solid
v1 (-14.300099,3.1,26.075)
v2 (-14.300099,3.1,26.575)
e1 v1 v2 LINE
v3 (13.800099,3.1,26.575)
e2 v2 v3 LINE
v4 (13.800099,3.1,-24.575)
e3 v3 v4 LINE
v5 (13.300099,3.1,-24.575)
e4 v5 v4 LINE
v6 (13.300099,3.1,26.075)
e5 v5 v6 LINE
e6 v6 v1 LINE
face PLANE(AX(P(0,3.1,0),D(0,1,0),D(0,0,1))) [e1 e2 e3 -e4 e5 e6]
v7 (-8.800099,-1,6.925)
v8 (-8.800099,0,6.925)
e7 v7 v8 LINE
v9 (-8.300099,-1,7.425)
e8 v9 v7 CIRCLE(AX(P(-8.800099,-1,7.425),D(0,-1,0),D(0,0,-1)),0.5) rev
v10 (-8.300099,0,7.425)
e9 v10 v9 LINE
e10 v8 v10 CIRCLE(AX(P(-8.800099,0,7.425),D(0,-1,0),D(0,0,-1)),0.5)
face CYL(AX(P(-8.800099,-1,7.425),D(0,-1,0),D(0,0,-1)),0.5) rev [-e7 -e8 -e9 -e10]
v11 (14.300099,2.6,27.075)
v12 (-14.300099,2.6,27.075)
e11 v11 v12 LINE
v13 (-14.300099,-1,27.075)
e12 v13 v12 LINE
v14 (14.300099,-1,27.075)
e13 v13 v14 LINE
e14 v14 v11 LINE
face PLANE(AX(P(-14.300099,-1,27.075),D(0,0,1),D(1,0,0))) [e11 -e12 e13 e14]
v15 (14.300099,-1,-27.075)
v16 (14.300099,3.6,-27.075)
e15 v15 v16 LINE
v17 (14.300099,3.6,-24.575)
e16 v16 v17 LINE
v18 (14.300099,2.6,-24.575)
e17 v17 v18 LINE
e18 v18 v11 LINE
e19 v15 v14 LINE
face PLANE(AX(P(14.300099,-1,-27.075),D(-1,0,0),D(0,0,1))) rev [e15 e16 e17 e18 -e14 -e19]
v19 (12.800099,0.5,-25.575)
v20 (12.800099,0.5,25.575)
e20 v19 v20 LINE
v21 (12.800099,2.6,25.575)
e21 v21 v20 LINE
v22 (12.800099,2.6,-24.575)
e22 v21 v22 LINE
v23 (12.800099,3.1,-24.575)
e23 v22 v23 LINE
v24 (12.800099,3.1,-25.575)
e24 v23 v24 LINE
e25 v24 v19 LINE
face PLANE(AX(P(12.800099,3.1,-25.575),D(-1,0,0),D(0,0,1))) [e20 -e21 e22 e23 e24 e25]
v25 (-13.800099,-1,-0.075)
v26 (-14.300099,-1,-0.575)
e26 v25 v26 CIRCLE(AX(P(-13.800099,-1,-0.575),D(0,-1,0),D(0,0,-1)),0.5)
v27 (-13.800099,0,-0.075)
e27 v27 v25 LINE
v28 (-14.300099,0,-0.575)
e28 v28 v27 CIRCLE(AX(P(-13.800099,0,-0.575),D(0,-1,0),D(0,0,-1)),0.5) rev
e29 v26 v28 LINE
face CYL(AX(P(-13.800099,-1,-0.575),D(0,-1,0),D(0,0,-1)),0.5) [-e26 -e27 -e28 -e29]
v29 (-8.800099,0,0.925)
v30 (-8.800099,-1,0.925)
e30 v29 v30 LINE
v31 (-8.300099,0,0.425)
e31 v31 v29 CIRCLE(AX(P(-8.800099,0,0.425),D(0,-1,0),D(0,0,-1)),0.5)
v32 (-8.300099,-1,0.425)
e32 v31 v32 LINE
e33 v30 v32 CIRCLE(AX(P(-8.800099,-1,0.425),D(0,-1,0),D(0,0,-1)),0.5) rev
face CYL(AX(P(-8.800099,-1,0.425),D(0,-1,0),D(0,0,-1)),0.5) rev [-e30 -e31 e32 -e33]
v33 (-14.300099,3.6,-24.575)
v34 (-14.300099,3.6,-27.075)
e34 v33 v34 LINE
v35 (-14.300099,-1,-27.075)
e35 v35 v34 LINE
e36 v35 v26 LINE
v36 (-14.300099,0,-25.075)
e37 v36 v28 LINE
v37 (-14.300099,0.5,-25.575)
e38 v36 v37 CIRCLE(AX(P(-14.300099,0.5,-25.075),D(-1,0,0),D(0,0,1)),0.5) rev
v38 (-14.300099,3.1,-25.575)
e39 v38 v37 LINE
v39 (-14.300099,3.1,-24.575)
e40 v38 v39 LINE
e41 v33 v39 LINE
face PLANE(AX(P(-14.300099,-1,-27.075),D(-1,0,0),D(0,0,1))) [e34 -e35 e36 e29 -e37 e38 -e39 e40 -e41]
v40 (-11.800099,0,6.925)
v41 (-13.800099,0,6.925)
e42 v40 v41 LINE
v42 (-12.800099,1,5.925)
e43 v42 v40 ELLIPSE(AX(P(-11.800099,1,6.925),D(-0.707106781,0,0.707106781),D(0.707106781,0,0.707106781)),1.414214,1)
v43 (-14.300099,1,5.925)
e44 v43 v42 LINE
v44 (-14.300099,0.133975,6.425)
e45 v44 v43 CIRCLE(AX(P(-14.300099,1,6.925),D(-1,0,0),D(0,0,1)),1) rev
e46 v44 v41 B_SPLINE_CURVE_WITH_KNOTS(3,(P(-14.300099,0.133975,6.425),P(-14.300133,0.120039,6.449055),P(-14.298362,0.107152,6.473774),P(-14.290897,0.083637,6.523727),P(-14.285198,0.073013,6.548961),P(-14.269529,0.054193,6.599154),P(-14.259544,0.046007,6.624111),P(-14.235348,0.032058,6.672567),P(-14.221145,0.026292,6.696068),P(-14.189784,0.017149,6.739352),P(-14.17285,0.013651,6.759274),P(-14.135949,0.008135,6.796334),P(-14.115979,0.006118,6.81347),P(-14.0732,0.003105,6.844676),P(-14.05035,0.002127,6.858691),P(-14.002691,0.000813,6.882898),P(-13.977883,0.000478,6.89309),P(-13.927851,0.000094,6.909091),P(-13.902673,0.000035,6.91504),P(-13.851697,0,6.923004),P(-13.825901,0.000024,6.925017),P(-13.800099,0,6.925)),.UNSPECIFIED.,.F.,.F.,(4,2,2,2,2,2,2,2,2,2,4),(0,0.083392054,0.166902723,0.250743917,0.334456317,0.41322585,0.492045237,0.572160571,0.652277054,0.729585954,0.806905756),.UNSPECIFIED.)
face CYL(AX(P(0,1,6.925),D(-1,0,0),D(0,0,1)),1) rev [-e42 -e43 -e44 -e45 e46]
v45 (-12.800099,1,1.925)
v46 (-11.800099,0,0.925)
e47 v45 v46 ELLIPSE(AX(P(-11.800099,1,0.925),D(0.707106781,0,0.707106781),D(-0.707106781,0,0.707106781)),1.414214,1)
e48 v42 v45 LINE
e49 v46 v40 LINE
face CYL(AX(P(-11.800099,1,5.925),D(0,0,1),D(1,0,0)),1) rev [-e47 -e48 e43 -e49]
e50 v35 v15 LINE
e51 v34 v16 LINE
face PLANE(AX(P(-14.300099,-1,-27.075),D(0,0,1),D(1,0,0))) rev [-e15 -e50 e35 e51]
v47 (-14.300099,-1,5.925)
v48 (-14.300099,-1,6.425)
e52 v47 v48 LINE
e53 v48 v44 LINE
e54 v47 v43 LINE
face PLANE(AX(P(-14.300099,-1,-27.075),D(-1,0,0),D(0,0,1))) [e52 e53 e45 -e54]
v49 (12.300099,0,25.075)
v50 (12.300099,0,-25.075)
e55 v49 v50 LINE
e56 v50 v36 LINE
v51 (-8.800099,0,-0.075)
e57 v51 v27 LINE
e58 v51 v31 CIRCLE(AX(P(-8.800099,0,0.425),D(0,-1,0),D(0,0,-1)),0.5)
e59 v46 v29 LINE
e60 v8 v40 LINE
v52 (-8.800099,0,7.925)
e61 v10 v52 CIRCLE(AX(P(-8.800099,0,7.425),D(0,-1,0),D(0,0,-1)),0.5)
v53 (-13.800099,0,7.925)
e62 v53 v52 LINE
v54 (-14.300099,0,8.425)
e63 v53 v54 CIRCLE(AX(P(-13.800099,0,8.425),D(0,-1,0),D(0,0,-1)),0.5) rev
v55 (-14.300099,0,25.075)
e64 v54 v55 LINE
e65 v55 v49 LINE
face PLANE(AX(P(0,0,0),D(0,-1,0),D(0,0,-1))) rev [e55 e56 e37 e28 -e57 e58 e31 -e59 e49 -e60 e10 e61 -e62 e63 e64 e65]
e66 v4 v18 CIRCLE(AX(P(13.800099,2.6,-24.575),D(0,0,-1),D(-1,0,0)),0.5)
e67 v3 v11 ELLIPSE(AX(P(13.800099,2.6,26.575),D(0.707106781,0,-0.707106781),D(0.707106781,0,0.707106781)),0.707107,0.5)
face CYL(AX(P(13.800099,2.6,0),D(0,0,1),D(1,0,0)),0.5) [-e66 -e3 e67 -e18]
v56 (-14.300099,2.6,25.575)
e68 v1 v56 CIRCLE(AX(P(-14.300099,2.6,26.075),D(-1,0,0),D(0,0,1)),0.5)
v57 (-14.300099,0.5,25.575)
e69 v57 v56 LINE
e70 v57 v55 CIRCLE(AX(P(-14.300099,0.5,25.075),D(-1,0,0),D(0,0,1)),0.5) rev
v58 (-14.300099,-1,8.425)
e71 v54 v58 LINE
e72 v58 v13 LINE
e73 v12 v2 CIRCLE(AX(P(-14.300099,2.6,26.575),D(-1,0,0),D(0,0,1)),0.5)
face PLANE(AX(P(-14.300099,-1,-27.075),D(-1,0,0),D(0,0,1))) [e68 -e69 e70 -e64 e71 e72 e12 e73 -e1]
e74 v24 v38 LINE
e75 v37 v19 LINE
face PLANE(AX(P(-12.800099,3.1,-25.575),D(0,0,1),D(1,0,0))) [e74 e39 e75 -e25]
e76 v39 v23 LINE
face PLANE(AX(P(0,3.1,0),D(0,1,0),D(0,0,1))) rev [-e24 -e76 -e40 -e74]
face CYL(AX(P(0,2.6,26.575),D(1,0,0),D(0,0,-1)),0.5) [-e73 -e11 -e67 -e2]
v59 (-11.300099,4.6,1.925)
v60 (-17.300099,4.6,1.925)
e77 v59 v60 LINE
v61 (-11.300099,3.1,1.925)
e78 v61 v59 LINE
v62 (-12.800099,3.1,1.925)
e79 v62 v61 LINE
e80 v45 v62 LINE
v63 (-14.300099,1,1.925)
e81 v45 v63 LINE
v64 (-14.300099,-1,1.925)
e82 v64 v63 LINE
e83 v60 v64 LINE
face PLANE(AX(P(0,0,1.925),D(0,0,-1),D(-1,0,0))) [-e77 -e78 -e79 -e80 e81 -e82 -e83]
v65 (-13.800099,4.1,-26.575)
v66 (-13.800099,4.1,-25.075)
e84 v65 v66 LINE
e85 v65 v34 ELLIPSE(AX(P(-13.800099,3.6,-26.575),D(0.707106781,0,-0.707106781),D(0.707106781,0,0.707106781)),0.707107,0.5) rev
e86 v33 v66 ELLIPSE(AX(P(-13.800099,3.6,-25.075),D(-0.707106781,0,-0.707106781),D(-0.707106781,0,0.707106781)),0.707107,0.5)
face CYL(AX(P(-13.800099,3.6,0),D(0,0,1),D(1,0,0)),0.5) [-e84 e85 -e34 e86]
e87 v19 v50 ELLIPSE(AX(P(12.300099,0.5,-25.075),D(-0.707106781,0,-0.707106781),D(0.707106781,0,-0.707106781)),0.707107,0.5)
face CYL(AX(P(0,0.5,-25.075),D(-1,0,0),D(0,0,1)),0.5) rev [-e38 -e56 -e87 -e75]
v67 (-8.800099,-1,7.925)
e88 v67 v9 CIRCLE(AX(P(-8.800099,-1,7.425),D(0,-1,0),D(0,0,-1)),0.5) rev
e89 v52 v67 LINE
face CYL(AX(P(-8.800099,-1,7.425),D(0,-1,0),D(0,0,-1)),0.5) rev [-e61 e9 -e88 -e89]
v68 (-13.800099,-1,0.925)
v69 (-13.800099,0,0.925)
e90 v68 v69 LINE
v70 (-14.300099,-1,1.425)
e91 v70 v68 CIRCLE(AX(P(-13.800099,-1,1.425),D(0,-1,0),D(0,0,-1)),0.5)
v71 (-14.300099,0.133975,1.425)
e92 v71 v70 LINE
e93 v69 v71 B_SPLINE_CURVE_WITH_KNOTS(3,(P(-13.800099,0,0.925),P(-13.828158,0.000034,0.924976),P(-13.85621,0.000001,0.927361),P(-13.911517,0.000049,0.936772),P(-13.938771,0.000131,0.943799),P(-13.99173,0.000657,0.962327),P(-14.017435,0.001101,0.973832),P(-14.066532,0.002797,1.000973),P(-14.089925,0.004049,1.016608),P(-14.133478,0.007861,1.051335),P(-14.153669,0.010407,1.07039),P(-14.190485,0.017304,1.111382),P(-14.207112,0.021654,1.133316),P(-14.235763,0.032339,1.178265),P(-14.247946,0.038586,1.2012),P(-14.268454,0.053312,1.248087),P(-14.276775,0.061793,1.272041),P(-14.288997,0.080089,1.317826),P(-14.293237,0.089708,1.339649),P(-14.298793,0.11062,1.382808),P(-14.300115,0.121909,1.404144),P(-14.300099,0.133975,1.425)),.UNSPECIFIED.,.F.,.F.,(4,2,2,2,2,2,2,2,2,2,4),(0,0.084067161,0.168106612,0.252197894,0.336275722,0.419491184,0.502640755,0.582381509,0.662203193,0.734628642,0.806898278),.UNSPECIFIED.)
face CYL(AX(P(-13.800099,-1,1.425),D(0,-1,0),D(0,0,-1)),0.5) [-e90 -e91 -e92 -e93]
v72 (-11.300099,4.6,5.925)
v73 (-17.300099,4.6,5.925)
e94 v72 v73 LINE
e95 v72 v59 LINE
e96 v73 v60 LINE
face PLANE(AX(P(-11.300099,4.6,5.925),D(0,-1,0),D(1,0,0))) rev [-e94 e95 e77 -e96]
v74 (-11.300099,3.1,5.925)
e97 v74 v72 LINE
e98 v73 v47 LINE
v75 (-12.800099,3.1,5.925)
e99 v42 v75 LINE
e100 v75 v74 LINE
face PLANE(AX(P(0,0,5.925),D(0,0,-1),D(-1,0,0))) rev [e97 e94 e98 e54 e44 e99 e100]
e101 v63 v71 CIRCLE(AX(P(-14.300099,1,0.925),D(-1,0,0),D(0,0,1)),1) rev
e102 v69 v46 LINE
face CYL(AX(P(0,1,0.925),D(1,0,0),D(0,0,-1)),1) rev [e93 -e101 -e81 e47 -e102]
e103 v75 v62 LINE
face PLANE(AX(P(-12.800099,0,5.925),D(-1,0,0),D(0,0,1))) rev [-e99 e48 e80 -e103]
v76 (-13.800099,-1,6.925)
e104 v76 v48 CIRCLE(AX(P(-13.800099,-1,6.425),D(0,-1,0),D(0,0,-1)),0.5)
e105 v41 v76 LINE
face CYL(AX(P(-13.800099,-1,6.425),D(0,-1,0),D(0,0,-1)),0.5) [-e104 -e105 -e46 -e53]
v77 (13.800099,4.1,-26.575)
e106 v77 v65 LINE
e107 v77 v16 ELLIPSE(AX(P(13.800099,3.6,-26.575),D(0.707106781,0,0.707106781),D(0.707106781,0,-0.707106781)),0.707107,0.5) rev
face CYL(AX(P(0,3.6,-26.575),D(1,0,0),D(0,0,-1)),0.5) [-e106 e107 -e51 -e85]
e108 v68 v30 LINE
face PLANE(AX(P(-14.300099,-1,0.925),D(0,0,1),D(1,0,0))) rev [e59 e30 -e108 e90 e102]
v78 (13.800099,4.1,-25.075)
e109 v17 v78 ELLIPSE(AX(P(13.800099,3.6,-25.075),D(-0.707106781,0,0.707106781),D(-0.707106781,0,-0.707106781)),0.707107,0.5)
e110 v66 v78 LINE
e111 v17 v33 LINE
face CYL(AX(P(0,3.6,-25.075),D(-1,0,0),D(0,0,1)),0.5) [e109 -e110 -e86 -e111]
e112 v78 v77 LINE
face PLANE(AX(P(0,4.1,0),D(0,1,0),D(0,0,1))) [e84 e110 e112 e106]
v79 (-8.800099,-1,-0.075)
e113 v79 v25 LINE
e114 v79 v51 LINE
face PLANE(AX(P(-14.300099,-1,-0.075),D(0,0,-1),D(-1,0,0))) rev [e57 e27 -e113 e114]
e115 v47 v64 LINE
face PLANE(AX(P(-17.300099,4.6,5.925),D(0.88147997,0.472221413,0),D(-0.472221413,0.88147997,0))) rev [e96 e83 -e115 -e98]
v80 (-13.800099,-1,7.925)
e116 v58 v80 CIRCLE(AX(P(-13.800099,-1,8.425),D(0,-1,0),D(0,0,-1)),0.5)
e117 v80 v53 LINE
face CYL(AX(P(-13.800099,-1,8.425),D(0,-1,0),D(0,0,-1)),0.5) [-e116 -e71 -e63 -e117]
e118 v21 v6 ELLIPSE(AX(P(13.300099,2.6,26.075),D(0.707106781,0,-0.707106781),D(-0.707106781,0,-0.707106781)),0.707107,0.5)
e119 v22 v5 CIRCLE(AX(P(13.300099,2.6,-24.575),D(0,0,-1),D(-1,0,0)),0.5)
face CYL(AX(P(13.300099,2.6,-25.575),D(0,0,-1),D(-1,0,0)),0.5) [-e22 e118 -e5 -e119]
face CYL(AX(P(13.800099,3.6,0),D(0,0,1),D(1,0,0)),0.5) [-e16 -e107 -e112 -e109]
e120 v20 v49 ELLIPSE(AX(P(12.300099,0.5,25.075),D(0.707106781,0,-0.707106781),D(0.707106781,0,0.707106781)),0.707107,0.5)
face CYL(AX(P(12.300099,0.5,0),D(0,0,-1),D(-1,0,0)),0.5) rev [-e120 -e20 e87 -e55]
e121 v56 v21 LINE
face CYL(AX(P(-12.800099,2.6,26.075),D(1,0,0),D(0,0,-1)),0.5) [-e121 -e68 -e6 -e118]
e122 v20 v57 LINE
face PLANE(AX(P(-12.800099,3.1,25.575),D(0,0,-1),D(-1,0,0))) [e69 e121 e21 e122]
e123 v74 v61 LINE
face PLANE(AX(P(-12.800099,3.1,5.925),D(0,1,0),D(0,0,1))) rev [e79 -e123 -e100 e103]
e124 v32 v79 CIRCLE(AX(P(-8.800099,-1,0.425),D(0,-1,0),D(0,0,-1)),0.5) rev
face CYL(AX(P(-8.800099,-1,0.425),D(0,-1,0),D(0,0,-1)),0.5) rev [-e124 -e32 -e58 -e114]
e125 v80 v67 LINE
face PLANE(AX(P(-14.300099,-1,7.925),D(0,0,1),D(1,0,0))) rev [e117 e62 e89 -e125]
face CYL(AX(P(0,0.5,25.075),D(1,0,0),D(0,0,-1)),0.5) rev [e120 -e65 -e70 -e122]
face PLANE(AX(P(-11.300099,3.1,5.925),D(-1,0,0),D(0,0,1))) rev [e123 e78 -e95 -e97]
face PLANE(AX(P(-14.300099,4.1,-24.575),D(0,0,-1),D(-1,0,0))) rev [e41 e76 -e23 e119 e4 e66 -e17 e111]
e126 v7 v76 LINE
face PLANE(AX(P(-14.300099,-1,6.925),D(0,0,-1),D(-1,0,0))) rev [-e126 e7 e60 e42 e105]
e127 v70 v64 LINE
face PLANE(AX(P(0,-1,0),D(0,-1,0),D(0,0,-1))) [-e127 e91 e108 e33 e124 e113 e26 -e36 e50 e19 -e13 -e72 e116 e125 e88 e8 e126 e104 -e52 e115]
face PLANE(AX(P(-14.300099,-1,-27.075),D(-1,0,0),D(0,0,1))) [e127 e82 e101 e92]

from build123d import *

# Parameters (mm, degrees)
SKETCH2_W           = 28.600197044
SKETCH2_H           = 54.15
BOSS_EXTRUDE1_DEPTH = 1
SKETCH2_3_W         = 28.600197044
SKETCH2_3_H         = 54.15
SKETCH2_3_W_2       = 25.600197044
SKETCH2_3_H_2       = 51.15
BOSS_EXTRUDE2_DEPTH = 3.1
SKETCH3_W           = 25.88588247
SKETCH3_H           = 51.15
CUT_EXTRUDE1_DEPTH  = 3.1
BOSS_EXTRUDE3_DEPTH = 4
SKETCH5_W           = 28.600197044
SKETCH5_H           = 2.5
BOSS_EXTRUDE4_DEPTH = 1
FILLET1_R           = 1
FILLET2_R           = 0.5
SKETCH7_W           = 6
SKETCH7_H           = 1
CUT_EXTRUDE2_DEPTH  = 1
FILLET3_R           = 0.5
FILLET4_R           = 0.5


with BuildPart() as part:
    # Sketch2 → Boss-Extrude1 (new body)
    with BuildSketch(Plane(origin=(0, 0, 0), x_dir=(1, 0, 0), z_dir=(0, 1, 0))):
        Rectangle(SKETCH2_W, SKETCH2_H)
    extrude(amount=-BOSS_EXTRUDE1_DEPTH)

    # Sketch2<3> → Boss-Extrude2 (add)
    with BuildSketch(Plane(origin=(0, 0, 0), x_dir=(1, 0, 0), z_dir=(0, 1, 0))):
        Rectangle(SKETCH2_3_W, SKETCH2_3_H)
        Rectangle(SKETCH2_3_W_2, SKETCH2_3_H_2, mode=Mode.SUBTRACT)
    extrude(amount=BOSS_EXTRUDE2_DEPTH)

    # Sketch3 → Cut-Extrude1 (cut)
    with BuildSketch(Plane(origin=(0, 3.1, 0), x_dir=(1, 0, 0), z_dir=(0, 1, 0))):
        with Locations((-6.642842713, 0)):
            Rectangle(SKETCH3_W, SKETCH3_H)
    extrude(amount=-CUT_EXTRUDE1_DEPTH, mode=Mode.SUBTRACT)

    # Sketch4 → Boss-Extrude3 (add)
    with BuildSketch(Plane.XY.offset(1.925)):
        Polygon((-14.300098522, 0), (-12.800098522, 0), (-12.800098522, 3.1), (-11.300098522, 3.1), (-11.300098522, 4.6), (-17.300098522, 4.6), (-14.300098522, -1), align=None)
    extrude(amount=BOSS_EXTRUDE3_DEPTH)

    # Sketch5 → Boss-Extrude4 (add)
    with BuildSketch(Plane(origin=(0, 3.1, 0), x_dir=(1, 0, 0), z_dir=(0, 1, 0))):
        with Locations((0, 25.825)):
            Rectangle(SKETCH5_W, SKETCH5_H)
    extrude(amount=BOSS_EXTRUDE4_DEPTH)

    # Fillet1
    fillet1_edges = [part.edges().sort_by_distance(p)[0] for p in [
        (-13.550098522, 0, 1.925),
        (-12.800098522, 0, 3.925),
        (-13.550098522, 0, 5.925),
    ]]
    fillet(fillet1_edges, radius=FILLET1_R)

    # Fillet2
    fillet2_edges = [part.edges().sort_by_distance(p)[0] for p in [
        (14.300098522, 3.1, 1.25),
        (0, 3.1, 27.075),
        (12.800098522, 3.1, 0.5),
        (-0.75, 3.1, 25.575),
        (-14.300098522, 4.1, -25.825),
        (0, 4.1, -24.575),
        (14.300098522, 4.1, -25.825),
        (0, 4.1, -27.075),
    ]]
    fillet(fillet2_edges, radius=FILLET2_R)

    # Sketch7 → Cut-Extrude2 (cut)
    with BuildSketch(Plane(origin=(0, 0, 0), x_dir=(1, 0, 0), z_dir=(0, 1, 0))):
        with Locations((-11.300098522, -0.425)):
            Rectangle(SKETCH7_W, SKETCH7_H)
        with Locations((-11.300098522, -7.425)):
            Rectangle(SKETCH7_W, SKETCH7_H)
    extrude(amount=-CUT_EXTRUDE2_DEPTH, mode=Mode.SUBTRACT)

    # Fillet3
    fillet3_edges = [part.edges().sort_by_distance(p)[0] for p in [
        (-14.300098522, -0.5, 0.925),
        (-14.300098522, -0.5, -0.075),
        (-8.300098522, -0.5, -0.075),
        (-8.300098522, -0.5, 0.925),
        (-14.300098522, -0.5, 7.925),
        (-14.300098522, -0.5, 6.925),
        (-8.300098522, -0.5, 6.925),
        (-8.300098522, -0.5, 7.925),
    ]]
    fillet(fillet3_edges, radius=FILLET3_R - 0.0001)  # a hair under: the kernel refuses the full size

    # Fillet4
    fillet4_edges = [part.edges().sort_by_distance(p)[0] for p in [
        (12.800098522, 0, 0),
        (-0.75, 0, -25.575),
        (-0.75, 0, 25.575),
    ]]
    fillet(fillet4_edges, radius=FILLET4_R)


solid = part.part
